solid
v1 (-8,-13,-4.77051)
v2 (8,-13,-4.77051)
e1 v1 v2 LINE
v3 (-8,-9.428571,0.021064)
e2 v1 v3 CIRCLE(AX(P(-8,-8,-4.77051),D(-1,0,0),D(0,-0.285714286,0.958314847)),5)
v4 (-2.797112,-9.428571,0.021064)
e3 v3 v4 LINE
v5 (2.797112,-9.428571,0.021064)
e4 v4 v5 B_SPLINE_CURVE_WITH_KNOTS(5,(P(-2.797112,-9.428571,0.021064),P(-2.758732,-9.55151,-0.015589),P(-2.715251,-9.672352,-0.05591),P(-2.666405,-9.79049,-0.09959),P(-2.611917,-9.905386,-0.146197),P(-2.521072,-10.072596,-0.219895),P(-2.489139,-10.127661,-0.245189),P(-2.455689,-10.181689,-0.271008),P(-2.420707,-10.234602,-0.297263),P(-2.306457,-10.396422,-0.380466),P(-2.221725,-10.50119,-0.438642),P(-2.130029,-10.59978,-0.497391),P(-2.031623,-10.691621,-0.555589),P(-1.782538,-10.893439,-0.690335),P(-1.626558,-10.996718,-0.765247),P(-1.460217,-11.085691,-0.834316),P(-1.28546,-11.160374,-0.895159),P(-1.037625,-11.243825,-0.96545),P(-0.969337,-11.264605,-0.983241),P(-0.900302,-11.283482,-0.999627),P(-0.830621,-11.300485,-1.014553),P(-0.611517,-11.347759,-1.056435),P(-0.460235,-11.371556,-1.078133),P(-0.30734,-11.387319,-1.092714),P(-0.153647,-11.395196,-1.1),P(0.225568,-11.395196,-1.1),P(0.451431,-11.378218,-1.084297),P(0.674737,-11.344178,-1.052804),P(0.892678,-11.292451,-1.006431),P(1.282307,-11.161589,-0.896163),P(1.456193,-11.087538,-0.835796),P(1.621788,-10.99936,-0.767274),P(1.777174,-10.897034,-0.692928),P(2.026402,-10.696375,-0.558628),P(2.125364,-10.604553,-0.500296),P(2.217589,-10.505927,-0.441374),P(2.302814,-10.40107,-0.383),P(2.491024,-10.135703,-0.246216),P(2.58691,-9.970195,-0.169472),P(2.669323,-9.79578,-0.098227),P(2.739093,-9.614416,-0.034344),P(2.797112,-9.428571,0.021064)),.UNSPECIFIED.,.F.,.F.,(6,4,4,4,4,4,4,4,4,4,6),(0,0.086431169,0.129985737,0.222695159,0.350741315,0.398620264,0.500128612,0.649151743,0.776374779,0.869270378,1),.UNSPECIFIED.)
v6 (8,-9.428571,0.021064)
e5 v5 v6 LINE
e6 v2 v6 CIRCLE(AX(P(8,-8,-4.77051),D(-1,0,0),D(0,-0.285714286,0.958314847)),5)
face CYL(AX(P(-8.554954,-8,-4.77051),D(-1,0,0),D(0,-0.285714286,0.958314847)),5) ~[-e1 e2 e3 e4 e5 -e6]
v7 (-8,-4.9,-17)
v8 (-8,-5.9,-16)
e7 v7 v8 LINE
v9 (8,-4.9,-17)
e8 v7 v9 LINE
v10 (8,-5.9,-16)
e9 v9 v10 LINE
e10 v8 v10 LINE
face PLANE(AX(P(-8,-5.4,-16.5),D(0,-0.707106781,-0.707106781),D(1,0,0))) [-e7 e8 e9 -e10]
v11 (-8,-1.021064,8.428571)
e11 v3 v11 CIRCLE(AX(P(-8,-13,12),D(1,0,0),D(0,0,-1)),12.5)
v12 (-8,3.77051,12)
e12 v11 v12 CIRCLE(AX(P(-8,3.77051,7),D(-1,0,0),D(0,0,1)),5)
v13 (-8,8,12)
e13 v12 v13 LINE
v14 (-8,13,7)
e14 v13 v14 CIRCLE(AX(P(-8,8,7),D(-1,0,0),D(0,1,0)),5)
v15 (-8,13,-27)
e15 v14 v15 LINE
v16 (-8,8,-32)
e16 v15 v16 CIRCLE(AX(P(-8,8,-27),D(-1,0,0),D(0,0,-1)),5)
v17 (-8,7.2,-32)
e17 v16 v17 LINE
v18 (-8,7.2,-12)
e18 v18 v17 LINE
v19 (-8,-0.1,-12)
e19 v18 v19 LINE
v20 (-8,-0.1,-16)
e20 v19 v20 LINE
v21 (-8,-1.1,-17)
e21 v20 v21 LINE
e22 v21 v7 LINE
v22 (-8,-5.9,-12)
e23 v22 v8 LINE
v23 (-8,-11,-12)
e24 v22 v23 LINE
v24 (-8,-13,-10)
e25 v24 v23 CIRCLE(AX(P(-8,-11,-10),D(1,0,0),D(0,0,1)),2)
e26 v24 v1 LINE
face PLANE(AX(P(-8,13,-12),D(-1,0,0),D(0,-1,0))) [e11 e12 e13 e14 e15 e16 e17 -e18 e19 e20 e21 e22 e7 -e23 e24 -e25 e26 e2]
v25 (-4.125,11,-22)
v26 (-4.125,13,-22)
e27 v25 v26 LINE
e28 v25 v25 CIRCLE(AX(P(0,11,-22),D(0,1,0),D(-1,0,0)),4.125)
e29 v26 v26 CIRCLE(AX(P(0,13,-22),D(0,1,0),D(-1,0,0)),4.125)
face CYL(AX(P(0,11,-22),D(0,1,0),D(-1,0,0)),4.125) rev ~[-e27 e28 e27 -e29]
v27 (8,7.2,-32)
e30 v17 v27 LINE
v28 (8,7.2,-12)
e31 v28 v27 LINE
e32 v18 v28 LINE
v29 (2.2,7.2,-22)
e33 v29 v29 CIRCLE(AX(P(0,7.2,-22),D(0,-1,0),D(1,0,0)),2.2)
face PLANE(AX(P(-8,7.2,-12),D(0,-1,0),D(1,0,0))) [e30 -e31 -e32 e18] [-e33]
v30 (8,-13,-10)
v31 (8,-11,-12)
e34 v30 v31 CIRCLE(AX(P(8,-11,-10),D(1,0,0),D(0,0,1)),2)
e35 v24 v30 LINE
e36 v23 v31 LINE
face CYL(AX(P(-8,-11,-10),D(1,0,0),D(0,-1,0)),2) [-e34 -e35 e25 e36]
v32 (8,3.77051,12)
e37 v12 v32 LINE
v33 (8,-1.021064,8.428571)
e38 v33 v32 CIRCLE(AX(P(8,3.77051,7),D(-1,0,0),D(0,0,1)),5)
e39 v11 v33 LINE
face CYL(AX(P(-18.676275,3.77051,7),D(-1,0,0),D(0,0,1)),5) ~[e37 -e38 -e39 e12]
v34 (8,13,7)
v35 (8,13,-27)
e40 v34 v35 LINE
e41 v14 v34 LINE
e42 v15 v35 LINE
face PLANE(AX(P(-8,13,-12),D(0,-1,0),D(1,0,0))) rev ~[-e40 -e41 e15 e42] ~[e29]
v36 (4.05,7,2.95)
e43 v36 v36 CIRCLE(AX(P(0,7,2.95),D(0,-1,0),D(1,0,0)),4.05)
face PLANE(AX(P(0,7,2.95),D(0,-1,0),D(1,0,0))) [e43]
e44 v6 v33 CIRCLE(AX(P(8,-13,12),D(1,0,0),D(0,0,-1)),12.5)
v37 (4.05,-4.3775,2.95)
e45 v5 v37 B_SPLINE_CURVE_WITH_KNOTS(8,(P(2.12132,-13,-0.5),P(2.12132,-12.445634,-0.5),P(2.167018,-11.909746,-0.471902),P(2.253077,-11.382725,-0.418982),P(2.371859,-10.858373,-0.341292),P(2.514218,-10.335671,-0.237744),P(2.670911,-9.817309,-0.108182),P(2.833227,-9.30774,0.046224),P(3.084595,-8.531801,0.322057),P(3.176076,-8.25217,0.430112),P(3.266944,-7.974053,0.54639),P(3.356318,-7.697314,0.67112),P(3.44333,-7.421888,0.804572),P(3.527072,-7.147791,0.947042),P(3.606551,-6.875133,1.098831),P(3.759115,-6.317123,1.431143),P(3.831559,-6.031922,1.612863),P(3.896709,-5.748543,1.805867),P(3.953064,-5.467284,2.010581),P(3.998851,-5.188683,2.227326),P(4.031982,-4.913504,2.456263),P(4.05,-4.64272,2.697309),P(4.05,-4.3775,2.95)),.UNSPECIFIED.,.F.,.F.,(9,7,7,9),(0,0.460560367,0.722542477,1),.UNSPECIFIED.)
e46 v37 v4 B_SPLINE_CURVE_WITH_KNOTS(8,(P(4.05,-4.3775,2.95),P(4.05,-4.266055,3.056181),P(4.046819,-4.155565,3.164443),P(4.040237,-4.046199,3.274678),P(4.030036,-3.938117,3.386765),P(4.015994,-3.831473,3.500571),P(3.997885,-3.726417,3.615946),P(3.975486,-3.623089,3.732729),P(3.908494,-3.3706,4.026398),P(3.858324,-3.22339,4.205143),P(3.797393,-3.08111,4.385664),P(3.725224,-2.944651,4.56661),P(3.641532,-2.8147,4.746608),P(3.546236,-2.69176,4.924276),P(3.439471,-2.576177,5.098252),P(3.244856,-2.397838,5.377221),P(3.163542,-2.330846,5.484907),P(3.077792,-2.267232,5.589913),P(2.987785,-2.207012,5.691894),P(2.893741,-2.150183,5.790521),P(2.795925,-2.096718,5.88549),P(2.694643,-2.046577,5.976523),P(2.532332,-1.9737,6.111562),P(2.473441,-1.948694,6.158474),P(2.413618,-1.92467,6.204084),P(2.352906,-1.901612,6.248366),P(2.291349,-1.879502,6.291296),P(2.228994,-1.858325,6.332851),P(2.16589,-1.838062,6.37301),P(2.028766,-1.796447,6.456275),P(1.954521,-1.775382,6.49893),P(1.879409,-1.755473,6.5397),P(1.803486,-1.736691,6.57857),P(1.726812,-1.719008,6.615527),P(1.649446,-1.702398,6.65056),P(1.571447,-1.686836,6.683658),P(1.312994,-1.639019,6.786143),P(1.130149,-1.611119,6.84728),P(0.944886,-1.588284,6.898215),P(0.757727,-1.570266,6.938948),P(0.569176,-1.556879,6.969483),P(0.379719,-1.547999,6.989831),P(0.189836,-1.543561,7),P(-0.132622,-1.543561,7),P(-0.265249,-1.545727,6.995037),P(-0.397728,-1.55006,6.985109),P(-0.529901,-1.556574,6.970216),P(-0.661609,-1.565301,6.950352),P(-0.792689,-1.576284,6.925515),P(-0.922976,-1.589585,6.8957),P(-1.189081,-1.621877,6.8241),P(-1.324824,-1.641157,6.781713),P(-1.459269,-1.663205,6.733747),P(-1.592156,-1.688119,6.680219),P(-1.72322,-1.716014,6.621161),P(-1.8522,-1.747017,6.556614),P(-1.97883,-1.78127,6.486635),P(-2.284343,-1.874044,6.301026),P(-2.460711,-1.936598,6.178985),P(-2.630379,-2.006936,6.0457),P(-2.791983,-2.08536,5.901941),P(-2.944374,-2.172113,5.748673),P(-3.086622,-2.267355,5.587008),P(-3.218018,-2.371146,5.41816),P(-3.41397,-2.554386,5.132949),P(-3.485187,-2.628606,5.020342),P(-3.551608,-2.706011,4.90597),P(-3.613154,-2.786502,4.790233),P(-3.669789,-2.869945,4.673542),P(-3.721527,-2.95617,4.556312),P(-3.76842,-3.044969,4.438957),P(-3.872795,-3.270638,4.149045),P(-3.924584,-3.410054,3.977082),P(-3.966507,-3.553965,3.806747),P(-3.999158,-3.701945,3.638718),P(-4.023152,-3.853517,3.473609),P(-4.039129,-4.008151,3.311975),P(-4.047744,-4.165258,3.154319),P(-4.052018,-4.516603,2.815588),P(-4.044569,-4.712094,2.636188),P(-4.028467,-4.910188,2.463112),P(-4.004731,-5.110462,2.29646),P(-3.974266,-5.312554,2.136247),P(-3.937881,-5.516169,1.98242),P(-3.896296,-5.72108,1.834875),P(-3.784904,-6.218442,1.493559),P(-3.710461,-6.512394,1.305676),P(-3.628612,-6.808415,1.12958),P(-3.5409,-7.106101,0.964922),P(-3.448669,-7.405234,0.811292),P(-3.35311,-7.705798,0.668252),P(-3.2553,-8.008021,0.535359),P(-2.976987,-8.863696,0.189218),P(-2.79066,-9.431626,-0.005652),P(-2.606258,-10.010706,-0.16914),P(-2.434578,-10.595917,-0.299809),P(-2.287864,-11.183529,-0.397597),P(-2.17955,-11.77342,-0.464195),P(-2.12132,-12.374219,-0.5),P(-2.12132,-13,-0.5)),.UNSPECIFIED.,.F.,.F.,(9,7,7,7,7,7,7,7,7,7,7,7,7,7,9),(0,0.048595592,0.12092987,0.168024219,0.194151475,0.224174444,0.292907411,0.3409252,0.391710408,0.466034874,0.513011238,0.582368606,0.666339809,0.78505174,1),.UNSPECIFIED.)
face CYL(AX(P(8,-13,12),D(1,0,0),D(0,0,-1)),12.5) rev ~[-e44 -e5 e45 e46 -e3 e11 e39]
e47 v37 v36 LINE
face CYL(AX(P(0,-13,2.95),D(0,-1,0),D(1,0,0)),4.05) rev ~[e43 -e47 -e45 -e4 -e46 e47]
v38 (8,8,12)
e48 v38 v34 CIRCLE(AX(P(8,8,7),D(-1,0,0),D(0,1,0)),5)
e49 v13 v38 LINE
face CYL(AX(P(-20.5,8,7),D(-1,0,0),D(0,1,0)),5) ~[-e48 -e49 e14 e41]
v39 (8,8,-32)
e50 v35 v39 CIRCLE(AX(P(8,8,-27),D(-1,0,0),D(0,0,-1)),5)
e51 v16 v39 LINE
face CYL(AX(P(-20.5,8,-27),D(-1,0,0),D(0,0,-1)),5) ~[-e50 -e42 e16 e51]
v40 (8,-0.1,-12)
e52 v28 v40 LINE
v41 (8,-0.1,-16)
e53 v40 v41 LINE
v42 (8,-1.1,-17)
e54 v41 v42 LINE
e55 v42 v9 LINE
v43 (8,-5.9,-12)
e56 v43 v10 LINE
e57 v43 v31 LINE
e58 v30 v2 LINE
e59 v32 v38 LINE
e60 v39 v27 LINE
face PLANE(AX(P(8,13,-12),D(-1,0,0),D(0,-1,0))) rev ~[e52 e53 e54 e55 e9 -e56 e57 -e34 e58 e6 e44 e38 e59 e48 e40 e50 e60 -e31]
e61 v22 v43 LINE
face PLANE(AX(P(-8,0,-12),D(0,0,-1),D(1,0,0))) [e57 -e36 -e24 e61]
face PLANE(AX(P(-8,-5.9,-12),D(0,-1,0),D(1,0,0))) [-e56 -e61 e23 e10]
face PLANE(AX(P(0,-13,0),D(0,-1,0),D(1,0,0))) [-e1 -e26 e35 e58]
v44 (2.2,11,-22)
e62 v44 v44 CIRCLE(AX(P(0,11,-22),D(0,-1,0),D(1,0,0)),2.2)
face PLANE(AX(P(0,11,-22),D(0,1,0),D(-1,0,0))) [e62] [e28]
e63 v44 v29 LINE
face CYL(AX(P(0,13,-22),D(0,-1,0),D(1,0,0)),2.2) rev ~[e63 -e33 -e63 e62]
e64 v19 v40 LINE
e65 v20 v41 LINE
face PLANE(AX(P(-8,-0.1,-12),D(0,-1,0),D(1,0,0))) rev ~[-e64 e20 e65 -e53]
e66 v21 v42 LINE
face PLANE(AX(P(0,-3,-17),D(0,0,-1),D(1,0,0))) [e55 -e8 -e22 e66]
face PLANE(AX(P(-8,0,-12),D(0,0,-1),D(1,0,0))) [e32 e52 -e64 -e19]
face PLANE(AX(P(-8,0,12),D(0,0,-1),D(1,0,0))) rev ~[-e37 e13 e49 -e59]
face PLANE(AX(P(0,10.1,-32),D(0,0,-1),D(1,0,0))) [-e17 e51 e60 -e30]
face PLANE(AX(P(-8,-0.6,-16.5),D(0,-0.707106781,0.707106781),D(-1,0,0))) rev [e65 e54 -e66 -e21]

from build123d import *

# Parameters (mm, degrees)
F0_W           = 16
F0_H           = 24
F1_DEPTH       = 13
F2_W           = 16
F2_H           = 5.8
F3_DEPTH       = 5
F4_DEPTH       = 20
F5_R           = 4.05
F6_DEPTH       = 20
F8_D           = 4.4
F8_CBORE_D     = 8.25
F8_CBORE_DEPTH = 2
F9_SIZE        = 1
F11_DEPTH      = 16.001
F12_T1_DEPTH   = 27.2312288127
F12_T3_DEPTH   = 27.2312288127
F12_T5_DEPTH   = 41
F12_T7_DEPTH   = 37.3525491562
F13_R          = 2


# Not quite as in the source:
# - a fillet or chamfer that OpenCascade refuses, or shapes differently, is made with other operations: its cross-section is extruded or revolved along the edge and cut away or added
# - a feature names something its author has since deleted; it is built from what else it names


with BuildPart() as f1:
    # F0 (on Front) → F1 (new body, symmetric)
    with BuildSketch(Plane.XZ):
        Rectangle(F0_W, F0_H)
    extrude(amount=F1_DEPTH, both=True)

    # F2 (on face) → F3 (join)
    with BuildSketch(Plane(origin=(0, 0, -12), x_dir=(1, 0, 0), z_dir=(0, 0, -1))):
        with Locations((0, 3)):
            Rectangle(F2_W, F2_H)
    extrude(amount=F3_DEPTH)

    # F2 (on face) → F4 (join)
    with BuildSketch(Plane(origin=(0, 0, -12), x_dir=(1, 0, 0), z_dir=(0, 0, -1))):
        with Locations((0, -10.1)):
            Rectangle(F2_W, F2_H)
    extrude(amount=F4_DEPTH)

    # F5 (on face) → F6 (cut)
    with BuildSketch(Plane.XZ.offset(13)):
        with Locations((0, 2.95)):
            Circle(F5_R)
    extrude(amount=-F6_DEPTH, mode=Mode.SUBTRACT)

    # F8 (through all)
    with Locations(Plane(origin=(0, 13, 0), x_dir=(-1, 0, 0), z_dir=(0, 1, 0))):
        with Locations((0, -22)):
            CounterBoreHole(F8_D / 2, F8_CBORE_D / 2, F8_CBORE_DEPTH)

    # F9
    f9_edges = [f1.edges().sort_by_distance(p)[0] for p in [
        (0, -5.9, -17),
        (0, -0.1, -17),
    ]]
    chamfer(f9_edges, length=F9_SIZE)

    # F10 (on face) → F11 (cut, through all)
    with BuildSketch(Plane.YZ.offset(8)):
        with BuildLine():
            Line((-13, 12), (-0.5, 12))
            ThreePointArc((-0.5, 12), (-21.8388347648, 20.8388347648), (-13, -0.5))
            Line((-13, -0.5), (-13, 12))
        make_face()
        with BuildLine():
            ThreePointArc((-13, -0.5), (-4.1611652352, 3.1611652352), (-0.5, 12))
            Line((-0.5, 12), (-13, 12))
            Line((-13, 12), (-13, -0.5))
        make_face()
    extrude(amount=-F11_DEPTH, mode=Mode.SUBTRACT)

    # F12: fillet of radius 5 on 5 edges, made by hand

    # F12_s2 → F12_t1 (cut)
    with BuildSketch(Plane.YZ.offset(-8.5549542346)):
        with BuildLine():
            ThreePointArc((-9.4285714286, 0.0210644063), (-12.0089186287, -1.7824383079), (-13, -4.7705098312))
            Line((-13, -4.7705098312), (-13, -0.5))
            ThreePointArc((-13, -0.5), (-11.1953802231, -0.369047961), (-9.4285714286, 0.0210644063))
        make_face()
    extrude(amount=F12_T1_DEPTH, mode=Mode.SUBTRACT)

    # F12_s4 → F12_t3 (cut)
    with BuildSketch(Plane.YZ.offset(-18.6762745781)):
        with BuildLine():
            ThreePointArc((-9.4285714286, 0.0210644063), (-12.0089186287, -1.7824383079), (-13, -4.7705098312))
            Line((-13, -4.7705098312), (-13, -0.5))
            ThreePointArc((-13, -0.5), (-11.1953802231, -0.369047961), (-9.4285714286, 0.0210644063))
        make_face()
    extrude(amount=F12_T3_DEPTH, mode=Mode.SUBTRACT)

    # F12_s6 → F12_t5 (cut)
    with BuildSketch(Plane.YZ.offset(-20.5)):
        with BuildLine():
            ThreePointArc((8, -32), (11.5355339059, -30.5355339059), (13, -27))
            Line((13, -27), (13, -32))
            Line((13, -32), (8, -32))
        make_face()
        with BuildLine():
            ThreePointArc((13, 7), (11.5355339059, 10.5355339059), (8, 12))
            Line((8, 12), (13, 12))
            Line((13, 12), (13, 7))
        make_face()
    extrude(amount=F12_T5_DEPTH, mode=Mode.SUBTRACT)

    # F12_s8 → F12_t7 (cut)
    with BuildSketch(Plane.YZ.offset(-18.6762745781)):
        with BuildLine():
            ThreePointArc((3.7705098312, 12), (0.7824383079, 11.0089186287), (-1.0210644063, 8.4285714286))
            ThreePointArc((-1.0210644063, 8.4285714286), (-0.630952039, 10.1953802231), (-0.5, 12))
            Line((-0.5, 12), (3.7705098312, 12))
        make_face()
    extrude(amount=F12_T7_DEPTH, mode=Mode.SUBTRACT)

    # F13
    f13_edges = [f1.edges().sort_by_distance(p)[0] for p in [
        (0, -13, -12),
    ]]
    fillet(f13_edges, radius=F13_R)


solid = f1.part
